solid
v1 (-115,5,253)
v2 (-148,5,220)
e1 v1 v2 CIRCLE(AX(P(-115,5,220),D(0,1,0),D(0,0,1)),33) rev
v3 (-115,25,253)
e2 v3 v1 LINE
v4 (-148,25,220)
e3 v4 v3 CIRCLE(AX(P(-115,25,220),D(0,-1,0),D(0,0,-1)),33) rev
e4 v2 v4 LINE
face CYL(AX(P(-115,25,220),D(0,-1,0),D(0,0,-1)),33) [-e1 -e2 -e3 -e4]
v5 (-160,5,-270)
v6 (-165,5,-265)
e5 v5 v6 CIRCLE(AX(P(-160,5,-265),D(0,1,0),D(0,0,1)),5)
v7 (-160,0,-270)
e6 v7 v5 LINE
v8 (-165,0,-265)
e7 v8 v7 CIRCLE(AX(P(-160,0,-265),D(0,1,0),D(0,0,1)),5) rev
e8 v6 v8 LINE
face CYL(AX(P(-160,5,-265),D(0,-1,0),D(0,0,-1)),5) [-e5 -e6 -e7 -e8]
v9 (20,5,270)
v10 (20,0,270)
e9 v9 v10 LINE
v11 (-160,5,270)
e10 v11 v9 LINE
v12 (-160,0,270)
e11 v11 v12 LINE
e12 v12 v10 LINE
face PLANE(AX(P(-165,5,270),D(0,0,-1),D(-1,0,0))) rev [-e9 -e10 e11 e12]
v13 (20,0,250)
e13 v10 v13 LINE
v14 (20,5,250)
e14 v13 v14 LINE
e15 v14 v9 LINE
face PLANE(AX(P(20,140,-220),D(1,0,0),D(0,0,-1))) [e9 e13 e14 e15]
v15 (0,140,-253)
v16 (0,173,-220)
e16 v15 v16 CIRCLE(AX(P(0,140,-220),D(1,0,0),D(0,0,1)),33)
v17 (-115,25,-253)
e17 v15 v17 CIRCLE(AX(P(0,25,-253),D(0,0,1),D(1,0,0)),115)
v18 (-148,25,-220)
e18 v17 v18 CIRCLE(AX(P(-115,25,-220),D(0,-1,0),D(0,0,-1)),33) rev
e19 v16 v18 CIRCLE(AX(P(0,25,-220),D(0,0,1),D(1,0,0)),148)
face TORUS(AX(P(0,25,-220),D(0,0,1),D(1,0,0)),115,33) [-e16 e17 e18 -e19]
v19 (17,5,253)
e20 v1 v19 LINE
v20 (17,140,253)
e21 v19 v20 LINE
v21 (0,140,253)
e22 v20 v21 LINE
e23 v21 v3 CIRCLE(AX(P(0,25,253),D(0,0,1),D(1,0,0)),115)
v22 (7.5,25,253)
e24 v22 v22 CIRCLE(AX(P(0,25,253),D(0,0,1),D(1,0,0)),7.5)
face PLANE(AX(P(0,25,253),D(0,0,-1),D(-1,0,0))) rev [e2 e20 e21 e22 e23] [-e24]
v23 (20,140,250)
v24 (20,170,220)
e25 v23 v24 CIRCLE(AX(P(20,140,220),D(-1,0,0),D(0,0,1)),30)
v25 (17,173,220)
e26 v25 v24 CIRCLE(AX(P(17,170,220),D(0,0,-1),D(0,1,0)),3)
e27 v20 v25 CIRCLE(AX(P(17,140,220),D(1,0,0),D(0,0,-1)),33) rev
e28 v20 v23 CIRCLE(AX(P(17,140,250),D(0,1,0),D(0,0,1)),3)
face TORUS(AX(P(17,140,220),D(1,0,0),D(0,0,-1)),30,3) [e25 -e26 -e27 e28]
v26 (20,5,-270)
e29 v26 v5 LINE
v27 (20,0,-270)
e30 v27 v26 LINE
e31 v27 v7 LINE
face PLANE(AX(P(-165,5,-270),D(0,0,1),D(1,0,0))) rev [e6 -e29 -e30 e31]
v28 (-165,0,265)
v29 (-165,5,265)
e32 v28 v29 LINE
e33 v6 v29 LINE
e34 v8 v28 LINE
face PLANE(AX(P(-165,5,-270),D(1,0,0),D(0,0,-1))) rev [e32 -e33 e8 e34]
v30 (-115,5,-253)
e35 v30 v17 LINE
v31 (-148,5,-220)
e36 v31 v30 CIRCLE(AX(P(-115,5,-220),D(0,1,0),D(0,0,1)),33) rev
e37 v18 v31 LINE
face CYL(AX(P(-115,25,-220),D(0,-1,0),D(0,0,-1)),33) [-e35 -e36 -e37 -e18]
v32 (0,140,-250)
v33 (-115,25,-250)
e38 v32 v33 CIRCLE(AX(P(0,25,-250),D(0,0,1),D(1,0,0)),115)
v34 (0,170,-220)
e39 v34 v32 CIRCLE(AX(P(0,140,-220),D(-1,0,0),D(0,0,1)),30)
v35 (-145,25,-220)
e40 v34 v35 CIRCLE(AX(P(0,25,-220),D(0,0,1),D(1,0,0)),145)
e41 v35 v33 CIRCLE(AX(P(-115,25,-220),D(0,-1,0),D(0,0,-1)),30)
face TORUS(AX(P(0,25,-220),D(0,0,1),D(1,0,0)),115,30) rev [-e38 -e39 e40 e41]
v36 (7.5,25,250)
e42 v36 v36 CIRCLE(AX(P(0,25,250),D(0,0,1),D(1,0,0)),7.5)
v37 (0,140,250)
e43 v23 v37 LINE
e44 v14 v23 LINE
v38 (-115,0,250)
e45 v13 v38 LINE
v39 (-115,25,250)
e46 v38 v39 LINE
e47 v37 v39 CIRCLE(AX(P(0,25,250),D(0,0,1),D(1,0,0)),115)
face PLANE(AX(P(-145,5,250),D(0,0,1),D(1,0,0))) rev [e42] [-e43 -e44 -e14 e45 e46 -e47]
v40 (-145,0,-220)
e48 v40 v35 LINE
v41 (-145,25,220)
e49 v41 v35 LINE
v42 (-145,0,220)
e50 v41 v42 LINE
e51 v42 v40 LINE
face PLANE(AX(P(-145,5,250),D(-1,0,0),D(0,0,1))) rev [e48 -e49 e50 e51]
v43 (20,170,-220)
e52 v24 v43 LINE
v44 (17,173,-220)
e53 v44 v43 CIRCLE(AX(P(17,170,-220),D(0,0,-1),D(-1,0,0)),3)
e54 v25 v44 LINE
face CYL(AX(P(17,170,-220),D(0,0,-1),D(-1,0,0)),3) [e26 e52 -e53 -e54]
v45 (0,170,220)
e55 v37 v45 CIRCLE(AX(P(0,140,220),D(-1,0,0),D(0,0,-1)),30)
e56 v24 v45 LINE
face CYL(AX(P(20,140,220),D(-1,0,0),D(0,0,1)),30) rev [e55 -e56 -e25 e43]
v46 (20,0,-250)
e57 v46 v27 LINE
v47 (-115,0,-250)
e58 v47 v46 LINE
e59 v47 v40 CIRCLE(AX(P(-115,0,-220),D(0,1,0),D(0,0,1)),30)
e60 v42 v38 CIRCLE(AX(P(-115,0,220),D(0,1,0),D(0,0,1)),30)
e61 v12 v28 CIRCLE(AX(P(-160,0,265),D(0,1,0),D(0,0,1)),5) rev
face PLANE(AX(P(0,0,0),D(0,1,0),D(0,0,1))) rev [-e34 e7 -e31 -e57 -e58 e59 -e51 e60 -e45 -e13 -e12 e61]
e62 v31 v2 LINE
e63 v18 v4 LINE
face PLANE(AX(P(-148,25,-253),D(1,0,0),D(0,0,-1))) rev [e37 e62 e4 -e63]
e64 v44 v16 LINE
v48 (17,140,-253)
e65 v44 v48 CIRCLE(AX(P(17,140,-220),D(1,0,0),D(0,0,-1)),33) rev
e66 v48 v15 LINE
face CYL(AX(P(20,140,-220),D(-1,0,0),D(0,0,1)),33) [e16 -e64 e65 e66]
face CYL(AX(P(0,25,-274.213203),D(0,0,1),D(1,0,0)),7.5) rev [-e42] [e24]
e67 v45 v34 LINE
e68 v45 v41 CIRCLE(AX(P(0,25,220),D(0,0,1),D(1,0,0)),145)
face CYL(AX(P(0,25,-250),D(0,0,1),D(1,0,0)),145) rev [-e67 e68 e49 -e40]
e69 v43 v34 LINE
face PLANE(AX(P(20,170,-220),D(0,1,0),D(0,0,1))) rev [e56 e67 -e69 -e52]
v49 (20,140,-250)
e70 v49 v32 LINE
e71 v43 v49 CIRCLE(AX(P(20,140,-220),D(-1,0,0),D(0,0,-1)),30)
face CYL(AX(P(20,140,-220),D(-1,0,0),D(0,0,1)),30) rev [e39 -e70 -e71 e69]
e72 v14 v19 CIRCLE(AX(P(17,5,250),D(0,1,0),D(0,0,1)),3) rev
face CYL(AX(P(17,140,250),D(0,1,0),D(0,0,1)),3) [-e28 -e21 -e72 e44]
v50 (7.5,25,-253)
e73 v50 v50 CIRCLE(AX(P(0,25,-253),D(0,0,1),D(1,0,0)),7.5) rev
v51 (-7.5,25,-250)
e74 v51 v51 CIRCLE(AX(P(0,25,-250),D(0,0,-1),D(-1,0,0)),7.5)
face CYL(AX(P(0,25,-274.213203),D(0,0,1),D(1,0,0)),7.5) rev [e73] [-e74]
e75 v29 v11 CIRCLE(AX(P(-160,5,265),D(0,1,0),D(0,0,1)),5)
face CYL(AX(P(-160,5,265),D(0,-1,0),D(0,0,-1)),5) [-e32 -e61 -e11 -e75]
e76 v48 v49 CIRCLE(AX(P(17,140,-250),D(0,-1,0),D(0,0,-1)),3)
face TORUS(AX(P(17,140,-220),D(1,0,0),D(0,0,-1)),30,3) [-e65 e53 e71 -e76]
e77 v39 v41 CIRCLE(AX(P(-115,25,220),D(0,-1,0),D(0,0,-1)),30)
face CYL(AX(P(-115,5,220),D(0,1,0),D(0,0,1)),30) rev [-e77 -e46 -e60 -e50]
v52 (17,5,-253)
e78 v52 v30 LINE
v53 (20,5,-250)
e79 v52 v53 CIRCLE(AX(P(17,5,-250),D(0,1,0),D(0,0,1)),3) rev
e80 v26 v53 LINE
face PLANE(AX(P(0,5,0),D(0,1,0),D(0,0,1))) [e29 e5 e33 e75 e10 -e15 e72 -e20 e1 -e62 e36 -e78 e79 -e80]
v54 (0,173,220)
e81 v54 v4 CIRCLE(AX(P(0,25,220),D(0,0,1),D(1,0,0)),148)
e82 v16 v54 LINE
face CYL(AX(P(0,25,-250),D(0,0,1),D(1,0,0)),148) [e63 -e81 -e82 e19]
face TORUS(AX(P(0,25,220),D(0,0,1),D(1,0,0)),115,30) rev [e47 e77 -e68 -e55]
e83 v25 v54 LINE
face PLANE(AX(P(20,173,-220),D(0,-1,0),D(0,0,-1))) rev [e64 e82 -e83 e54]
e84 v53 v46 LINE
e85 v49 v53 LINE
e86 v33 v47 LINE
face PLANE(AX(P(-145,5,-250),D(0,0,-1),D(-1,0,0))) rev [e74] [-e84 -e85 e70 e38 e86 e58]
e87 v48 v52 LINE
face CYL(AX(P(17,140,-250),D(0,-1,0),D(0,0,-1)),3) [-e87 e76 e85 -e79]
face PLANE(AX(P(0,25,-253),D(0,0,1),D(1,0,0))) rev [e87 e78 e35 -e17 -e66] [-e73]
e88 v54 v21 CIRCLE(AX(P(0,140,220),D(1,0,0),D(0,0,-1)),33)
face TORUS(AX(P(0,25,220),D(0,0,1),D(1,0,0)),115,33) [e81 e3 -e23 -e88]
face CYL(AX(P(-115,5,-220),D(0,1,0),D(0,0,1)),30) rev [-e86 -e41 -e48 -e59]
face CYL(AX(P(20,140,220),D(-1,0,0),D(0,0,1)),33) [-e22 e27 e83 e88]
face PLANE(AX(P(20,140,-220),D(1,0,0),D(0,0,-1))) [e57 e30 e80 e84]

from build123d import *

# Parameters (mm, degrees)
BOSS_EXTRUDE1_DEPTH = 5
BOSS_EXTRUDE3_DEPTH = 20
FILLET5_R           = 30
FILLET6_R           = 33
FILLET4_R           = 5
REVOLVE3_ANGLE      = 90
BOSS_EXTRUDE4_DEPTH = 20
CUT_EXTRUDE1_REACH  = 577.05
SKETCH10_R          = 7.5
FILLET7_R           = 3


with BuildPart() as part:
    # Sketch1 → Boss-Extrude1 (new body)
    with BuildSketch(Plane(origin=(0, 0, 0), x_dir=(1, 0, 0), z_dir=(0, 1, 0))):
        Polygon((-165, 270), (-165, -270), (0, -270), (0, -250), (-145, -250), (-145, 250), (0, 250), (0, 270), align=None)
    extrude(amount=BOSS_EXTRUDE1_DEPTH)

    # Sketch7 → Boss-Extrude3 (add)
    with BuildSketch(Plane(origin=(0, 5, 0), x_dir=(1, 0, 0), z_dir=(0, 1, 0))):
        Polygon((0, 253), (-148, 253), (-148, -253), (0, -253), (0, -250), (-145, -250), (-145, 250), (0, 250), align=None)
    extrude(amount=BOSS_EXTRUDE3_DEPTH)

    # Fillet5
    fillet5_edges = [part.edges().sort_by_distance(p)[0] for p in [
        (-145, 12.5, -250),
        (-145, 12.5, 250),
    ]]
    fillet(fillet5_edges, radius=FILLET5_R)

    # Fillet6
    fillet6_edges = [part.edges().sort_by_distance(p)[0] for p in [
        (-148, 15, -253),
        (-148, 15, 253),
    ]]
    fillet(fillet6_edges, radius=FILLET6_R)

    # Fillet4
    fillet4_edges = [part.edges().sort_by_distance(p)[0] for p in [
        (-165, 2.5, 270),
        (-165, 2.5, -270),
    ]]
    fillet(fillet4_edges, radius=FILLET4_R)

    # Sketch8 → Revolve3 (revolve)
    with BuildSketch(Plane(origin=(0, 25, 0), x_dir=(1, 0, 0), z_dir=(0, 1, 0))):
        with BuildLine():
            Line((0, 253), (-115, 253))
            ThreePointArc((-115, 253), (-138.334523779, 243.334523779), (-148, 220))
            Line((-148, 220), (-148, -220))
            ThreePointArc((-148, -220), (-138.334523779, -243.334523779), (-115, -253))
            Line((-115, -253), (0, -253))
            Line((0, -253), (0, -250))
            Line((0, -250), (-115, -250))
            ThreePointArc((-115, -250), (-136.213203436, -241.213203436), (-145, -220))
            Line((-145, -220), (-145, 220))
            ThreePointArc((-145, 220), (-136.213203436, 241.213203436), (-115, 250))
            Line((-115, 250), (0, 250))
            Line((0, 250), (0, 253))
        make_face()
    revolve(axis=Axis((0, 25, -250), (0, 0, -1)), revolution_arc=REVOLVE3_ANGLE)

    # Sketch9 → Boss-Extrude4 (add)
    with BuildSketch(Plane(origin=(0, 0, 0), x_dir=(0, 0, -1), z_dir=(1, 0, 0))):
        with BuildLine():
            Line((253, 25), (253, 140))
            ThreePointArc((253, 140), (243.334523779, 163.334523779), (220, 173))
            Line((220, 173), (-220, 173))
            ThreePointArc((-220, 173), (-243.334523779, 163.334523779), (-253, 140))
            Line((-253, 140), (-253, 25))
            Line((-253, 25), (-253, 5))
            Line((-253, 5), (-270, 5))
            Line((-270, 5), (-270, 0))
            Line((-270, 0), (-250, 0))
            Line((-250, 0), (-250, 25))
            Line((-250, 25), (-250, 140))
            ThreePointArc((-250, 140), (-241.213203436, 161.213203436), (-220, 170))
            Line((-220, 170), (220, 170))
            ThreePointArc((220, 170), (241.213203436, 161.213203436), (250, 140))
            Line((250, 140), (250, 25))
            Line((250, 25), (250, 0))
            Line((250, 0), (270, 0))
            Line((270, 0), (270, 5))
            Line((270, 5), (253, 5))
            Line((253, 5), (253, 25))
        make_face()
    extrude(amount=BOSS_EXTRUDE4_DEPTH)

    # Cut-Extrude1: up to this face of the body (flat: up to its plane)
    cut_extrude1_end = Plane(part.part.faces().sort_by_distance((-39.787657223, 64.787657223, -253))[0])
    # Sketch10 → Cut-Extrude1 (cut, up to the picked face)
    with BuildSketch(Plane.XY.offset(253), mode=Mode.PRIVATE) as cut_extrude1_sk1:
        with Locations((0, 25)):
            Circle(SKETCH10_R)
    cut_extrude1_tool1 = split(extrude(cut_extrude1_sk1.sketch, amount=-CUT_EXTRUDE1_REACH, mode=Mode.PRIVATE), bisect_by=cut_extrude1_end, keep=Keep.BOTH, mode=Mode.PRIVATE)
    add(cut_extrude1_tool1.solids().sort_by(Axis((0, 25, 253), (0, 0, -1)))[0], mode=Mode.SUBTRACT)

    # Fillet7
    fillet7_edges = [part.edges().sort_by_distance(p)[0] for p in [
        (20, 72.5, -253),
        (20, 163.334523779, -243.334523779),
        (20, 173, 0),
        (20, 163.334523779, 243.334523779),
        (20, 72.5, 253),
    ]]
    fillet(fillet7_edges, radius=FILLET7_R - 0.0001)  # a hair under: the kernel refuses the full size


solid = part.part
